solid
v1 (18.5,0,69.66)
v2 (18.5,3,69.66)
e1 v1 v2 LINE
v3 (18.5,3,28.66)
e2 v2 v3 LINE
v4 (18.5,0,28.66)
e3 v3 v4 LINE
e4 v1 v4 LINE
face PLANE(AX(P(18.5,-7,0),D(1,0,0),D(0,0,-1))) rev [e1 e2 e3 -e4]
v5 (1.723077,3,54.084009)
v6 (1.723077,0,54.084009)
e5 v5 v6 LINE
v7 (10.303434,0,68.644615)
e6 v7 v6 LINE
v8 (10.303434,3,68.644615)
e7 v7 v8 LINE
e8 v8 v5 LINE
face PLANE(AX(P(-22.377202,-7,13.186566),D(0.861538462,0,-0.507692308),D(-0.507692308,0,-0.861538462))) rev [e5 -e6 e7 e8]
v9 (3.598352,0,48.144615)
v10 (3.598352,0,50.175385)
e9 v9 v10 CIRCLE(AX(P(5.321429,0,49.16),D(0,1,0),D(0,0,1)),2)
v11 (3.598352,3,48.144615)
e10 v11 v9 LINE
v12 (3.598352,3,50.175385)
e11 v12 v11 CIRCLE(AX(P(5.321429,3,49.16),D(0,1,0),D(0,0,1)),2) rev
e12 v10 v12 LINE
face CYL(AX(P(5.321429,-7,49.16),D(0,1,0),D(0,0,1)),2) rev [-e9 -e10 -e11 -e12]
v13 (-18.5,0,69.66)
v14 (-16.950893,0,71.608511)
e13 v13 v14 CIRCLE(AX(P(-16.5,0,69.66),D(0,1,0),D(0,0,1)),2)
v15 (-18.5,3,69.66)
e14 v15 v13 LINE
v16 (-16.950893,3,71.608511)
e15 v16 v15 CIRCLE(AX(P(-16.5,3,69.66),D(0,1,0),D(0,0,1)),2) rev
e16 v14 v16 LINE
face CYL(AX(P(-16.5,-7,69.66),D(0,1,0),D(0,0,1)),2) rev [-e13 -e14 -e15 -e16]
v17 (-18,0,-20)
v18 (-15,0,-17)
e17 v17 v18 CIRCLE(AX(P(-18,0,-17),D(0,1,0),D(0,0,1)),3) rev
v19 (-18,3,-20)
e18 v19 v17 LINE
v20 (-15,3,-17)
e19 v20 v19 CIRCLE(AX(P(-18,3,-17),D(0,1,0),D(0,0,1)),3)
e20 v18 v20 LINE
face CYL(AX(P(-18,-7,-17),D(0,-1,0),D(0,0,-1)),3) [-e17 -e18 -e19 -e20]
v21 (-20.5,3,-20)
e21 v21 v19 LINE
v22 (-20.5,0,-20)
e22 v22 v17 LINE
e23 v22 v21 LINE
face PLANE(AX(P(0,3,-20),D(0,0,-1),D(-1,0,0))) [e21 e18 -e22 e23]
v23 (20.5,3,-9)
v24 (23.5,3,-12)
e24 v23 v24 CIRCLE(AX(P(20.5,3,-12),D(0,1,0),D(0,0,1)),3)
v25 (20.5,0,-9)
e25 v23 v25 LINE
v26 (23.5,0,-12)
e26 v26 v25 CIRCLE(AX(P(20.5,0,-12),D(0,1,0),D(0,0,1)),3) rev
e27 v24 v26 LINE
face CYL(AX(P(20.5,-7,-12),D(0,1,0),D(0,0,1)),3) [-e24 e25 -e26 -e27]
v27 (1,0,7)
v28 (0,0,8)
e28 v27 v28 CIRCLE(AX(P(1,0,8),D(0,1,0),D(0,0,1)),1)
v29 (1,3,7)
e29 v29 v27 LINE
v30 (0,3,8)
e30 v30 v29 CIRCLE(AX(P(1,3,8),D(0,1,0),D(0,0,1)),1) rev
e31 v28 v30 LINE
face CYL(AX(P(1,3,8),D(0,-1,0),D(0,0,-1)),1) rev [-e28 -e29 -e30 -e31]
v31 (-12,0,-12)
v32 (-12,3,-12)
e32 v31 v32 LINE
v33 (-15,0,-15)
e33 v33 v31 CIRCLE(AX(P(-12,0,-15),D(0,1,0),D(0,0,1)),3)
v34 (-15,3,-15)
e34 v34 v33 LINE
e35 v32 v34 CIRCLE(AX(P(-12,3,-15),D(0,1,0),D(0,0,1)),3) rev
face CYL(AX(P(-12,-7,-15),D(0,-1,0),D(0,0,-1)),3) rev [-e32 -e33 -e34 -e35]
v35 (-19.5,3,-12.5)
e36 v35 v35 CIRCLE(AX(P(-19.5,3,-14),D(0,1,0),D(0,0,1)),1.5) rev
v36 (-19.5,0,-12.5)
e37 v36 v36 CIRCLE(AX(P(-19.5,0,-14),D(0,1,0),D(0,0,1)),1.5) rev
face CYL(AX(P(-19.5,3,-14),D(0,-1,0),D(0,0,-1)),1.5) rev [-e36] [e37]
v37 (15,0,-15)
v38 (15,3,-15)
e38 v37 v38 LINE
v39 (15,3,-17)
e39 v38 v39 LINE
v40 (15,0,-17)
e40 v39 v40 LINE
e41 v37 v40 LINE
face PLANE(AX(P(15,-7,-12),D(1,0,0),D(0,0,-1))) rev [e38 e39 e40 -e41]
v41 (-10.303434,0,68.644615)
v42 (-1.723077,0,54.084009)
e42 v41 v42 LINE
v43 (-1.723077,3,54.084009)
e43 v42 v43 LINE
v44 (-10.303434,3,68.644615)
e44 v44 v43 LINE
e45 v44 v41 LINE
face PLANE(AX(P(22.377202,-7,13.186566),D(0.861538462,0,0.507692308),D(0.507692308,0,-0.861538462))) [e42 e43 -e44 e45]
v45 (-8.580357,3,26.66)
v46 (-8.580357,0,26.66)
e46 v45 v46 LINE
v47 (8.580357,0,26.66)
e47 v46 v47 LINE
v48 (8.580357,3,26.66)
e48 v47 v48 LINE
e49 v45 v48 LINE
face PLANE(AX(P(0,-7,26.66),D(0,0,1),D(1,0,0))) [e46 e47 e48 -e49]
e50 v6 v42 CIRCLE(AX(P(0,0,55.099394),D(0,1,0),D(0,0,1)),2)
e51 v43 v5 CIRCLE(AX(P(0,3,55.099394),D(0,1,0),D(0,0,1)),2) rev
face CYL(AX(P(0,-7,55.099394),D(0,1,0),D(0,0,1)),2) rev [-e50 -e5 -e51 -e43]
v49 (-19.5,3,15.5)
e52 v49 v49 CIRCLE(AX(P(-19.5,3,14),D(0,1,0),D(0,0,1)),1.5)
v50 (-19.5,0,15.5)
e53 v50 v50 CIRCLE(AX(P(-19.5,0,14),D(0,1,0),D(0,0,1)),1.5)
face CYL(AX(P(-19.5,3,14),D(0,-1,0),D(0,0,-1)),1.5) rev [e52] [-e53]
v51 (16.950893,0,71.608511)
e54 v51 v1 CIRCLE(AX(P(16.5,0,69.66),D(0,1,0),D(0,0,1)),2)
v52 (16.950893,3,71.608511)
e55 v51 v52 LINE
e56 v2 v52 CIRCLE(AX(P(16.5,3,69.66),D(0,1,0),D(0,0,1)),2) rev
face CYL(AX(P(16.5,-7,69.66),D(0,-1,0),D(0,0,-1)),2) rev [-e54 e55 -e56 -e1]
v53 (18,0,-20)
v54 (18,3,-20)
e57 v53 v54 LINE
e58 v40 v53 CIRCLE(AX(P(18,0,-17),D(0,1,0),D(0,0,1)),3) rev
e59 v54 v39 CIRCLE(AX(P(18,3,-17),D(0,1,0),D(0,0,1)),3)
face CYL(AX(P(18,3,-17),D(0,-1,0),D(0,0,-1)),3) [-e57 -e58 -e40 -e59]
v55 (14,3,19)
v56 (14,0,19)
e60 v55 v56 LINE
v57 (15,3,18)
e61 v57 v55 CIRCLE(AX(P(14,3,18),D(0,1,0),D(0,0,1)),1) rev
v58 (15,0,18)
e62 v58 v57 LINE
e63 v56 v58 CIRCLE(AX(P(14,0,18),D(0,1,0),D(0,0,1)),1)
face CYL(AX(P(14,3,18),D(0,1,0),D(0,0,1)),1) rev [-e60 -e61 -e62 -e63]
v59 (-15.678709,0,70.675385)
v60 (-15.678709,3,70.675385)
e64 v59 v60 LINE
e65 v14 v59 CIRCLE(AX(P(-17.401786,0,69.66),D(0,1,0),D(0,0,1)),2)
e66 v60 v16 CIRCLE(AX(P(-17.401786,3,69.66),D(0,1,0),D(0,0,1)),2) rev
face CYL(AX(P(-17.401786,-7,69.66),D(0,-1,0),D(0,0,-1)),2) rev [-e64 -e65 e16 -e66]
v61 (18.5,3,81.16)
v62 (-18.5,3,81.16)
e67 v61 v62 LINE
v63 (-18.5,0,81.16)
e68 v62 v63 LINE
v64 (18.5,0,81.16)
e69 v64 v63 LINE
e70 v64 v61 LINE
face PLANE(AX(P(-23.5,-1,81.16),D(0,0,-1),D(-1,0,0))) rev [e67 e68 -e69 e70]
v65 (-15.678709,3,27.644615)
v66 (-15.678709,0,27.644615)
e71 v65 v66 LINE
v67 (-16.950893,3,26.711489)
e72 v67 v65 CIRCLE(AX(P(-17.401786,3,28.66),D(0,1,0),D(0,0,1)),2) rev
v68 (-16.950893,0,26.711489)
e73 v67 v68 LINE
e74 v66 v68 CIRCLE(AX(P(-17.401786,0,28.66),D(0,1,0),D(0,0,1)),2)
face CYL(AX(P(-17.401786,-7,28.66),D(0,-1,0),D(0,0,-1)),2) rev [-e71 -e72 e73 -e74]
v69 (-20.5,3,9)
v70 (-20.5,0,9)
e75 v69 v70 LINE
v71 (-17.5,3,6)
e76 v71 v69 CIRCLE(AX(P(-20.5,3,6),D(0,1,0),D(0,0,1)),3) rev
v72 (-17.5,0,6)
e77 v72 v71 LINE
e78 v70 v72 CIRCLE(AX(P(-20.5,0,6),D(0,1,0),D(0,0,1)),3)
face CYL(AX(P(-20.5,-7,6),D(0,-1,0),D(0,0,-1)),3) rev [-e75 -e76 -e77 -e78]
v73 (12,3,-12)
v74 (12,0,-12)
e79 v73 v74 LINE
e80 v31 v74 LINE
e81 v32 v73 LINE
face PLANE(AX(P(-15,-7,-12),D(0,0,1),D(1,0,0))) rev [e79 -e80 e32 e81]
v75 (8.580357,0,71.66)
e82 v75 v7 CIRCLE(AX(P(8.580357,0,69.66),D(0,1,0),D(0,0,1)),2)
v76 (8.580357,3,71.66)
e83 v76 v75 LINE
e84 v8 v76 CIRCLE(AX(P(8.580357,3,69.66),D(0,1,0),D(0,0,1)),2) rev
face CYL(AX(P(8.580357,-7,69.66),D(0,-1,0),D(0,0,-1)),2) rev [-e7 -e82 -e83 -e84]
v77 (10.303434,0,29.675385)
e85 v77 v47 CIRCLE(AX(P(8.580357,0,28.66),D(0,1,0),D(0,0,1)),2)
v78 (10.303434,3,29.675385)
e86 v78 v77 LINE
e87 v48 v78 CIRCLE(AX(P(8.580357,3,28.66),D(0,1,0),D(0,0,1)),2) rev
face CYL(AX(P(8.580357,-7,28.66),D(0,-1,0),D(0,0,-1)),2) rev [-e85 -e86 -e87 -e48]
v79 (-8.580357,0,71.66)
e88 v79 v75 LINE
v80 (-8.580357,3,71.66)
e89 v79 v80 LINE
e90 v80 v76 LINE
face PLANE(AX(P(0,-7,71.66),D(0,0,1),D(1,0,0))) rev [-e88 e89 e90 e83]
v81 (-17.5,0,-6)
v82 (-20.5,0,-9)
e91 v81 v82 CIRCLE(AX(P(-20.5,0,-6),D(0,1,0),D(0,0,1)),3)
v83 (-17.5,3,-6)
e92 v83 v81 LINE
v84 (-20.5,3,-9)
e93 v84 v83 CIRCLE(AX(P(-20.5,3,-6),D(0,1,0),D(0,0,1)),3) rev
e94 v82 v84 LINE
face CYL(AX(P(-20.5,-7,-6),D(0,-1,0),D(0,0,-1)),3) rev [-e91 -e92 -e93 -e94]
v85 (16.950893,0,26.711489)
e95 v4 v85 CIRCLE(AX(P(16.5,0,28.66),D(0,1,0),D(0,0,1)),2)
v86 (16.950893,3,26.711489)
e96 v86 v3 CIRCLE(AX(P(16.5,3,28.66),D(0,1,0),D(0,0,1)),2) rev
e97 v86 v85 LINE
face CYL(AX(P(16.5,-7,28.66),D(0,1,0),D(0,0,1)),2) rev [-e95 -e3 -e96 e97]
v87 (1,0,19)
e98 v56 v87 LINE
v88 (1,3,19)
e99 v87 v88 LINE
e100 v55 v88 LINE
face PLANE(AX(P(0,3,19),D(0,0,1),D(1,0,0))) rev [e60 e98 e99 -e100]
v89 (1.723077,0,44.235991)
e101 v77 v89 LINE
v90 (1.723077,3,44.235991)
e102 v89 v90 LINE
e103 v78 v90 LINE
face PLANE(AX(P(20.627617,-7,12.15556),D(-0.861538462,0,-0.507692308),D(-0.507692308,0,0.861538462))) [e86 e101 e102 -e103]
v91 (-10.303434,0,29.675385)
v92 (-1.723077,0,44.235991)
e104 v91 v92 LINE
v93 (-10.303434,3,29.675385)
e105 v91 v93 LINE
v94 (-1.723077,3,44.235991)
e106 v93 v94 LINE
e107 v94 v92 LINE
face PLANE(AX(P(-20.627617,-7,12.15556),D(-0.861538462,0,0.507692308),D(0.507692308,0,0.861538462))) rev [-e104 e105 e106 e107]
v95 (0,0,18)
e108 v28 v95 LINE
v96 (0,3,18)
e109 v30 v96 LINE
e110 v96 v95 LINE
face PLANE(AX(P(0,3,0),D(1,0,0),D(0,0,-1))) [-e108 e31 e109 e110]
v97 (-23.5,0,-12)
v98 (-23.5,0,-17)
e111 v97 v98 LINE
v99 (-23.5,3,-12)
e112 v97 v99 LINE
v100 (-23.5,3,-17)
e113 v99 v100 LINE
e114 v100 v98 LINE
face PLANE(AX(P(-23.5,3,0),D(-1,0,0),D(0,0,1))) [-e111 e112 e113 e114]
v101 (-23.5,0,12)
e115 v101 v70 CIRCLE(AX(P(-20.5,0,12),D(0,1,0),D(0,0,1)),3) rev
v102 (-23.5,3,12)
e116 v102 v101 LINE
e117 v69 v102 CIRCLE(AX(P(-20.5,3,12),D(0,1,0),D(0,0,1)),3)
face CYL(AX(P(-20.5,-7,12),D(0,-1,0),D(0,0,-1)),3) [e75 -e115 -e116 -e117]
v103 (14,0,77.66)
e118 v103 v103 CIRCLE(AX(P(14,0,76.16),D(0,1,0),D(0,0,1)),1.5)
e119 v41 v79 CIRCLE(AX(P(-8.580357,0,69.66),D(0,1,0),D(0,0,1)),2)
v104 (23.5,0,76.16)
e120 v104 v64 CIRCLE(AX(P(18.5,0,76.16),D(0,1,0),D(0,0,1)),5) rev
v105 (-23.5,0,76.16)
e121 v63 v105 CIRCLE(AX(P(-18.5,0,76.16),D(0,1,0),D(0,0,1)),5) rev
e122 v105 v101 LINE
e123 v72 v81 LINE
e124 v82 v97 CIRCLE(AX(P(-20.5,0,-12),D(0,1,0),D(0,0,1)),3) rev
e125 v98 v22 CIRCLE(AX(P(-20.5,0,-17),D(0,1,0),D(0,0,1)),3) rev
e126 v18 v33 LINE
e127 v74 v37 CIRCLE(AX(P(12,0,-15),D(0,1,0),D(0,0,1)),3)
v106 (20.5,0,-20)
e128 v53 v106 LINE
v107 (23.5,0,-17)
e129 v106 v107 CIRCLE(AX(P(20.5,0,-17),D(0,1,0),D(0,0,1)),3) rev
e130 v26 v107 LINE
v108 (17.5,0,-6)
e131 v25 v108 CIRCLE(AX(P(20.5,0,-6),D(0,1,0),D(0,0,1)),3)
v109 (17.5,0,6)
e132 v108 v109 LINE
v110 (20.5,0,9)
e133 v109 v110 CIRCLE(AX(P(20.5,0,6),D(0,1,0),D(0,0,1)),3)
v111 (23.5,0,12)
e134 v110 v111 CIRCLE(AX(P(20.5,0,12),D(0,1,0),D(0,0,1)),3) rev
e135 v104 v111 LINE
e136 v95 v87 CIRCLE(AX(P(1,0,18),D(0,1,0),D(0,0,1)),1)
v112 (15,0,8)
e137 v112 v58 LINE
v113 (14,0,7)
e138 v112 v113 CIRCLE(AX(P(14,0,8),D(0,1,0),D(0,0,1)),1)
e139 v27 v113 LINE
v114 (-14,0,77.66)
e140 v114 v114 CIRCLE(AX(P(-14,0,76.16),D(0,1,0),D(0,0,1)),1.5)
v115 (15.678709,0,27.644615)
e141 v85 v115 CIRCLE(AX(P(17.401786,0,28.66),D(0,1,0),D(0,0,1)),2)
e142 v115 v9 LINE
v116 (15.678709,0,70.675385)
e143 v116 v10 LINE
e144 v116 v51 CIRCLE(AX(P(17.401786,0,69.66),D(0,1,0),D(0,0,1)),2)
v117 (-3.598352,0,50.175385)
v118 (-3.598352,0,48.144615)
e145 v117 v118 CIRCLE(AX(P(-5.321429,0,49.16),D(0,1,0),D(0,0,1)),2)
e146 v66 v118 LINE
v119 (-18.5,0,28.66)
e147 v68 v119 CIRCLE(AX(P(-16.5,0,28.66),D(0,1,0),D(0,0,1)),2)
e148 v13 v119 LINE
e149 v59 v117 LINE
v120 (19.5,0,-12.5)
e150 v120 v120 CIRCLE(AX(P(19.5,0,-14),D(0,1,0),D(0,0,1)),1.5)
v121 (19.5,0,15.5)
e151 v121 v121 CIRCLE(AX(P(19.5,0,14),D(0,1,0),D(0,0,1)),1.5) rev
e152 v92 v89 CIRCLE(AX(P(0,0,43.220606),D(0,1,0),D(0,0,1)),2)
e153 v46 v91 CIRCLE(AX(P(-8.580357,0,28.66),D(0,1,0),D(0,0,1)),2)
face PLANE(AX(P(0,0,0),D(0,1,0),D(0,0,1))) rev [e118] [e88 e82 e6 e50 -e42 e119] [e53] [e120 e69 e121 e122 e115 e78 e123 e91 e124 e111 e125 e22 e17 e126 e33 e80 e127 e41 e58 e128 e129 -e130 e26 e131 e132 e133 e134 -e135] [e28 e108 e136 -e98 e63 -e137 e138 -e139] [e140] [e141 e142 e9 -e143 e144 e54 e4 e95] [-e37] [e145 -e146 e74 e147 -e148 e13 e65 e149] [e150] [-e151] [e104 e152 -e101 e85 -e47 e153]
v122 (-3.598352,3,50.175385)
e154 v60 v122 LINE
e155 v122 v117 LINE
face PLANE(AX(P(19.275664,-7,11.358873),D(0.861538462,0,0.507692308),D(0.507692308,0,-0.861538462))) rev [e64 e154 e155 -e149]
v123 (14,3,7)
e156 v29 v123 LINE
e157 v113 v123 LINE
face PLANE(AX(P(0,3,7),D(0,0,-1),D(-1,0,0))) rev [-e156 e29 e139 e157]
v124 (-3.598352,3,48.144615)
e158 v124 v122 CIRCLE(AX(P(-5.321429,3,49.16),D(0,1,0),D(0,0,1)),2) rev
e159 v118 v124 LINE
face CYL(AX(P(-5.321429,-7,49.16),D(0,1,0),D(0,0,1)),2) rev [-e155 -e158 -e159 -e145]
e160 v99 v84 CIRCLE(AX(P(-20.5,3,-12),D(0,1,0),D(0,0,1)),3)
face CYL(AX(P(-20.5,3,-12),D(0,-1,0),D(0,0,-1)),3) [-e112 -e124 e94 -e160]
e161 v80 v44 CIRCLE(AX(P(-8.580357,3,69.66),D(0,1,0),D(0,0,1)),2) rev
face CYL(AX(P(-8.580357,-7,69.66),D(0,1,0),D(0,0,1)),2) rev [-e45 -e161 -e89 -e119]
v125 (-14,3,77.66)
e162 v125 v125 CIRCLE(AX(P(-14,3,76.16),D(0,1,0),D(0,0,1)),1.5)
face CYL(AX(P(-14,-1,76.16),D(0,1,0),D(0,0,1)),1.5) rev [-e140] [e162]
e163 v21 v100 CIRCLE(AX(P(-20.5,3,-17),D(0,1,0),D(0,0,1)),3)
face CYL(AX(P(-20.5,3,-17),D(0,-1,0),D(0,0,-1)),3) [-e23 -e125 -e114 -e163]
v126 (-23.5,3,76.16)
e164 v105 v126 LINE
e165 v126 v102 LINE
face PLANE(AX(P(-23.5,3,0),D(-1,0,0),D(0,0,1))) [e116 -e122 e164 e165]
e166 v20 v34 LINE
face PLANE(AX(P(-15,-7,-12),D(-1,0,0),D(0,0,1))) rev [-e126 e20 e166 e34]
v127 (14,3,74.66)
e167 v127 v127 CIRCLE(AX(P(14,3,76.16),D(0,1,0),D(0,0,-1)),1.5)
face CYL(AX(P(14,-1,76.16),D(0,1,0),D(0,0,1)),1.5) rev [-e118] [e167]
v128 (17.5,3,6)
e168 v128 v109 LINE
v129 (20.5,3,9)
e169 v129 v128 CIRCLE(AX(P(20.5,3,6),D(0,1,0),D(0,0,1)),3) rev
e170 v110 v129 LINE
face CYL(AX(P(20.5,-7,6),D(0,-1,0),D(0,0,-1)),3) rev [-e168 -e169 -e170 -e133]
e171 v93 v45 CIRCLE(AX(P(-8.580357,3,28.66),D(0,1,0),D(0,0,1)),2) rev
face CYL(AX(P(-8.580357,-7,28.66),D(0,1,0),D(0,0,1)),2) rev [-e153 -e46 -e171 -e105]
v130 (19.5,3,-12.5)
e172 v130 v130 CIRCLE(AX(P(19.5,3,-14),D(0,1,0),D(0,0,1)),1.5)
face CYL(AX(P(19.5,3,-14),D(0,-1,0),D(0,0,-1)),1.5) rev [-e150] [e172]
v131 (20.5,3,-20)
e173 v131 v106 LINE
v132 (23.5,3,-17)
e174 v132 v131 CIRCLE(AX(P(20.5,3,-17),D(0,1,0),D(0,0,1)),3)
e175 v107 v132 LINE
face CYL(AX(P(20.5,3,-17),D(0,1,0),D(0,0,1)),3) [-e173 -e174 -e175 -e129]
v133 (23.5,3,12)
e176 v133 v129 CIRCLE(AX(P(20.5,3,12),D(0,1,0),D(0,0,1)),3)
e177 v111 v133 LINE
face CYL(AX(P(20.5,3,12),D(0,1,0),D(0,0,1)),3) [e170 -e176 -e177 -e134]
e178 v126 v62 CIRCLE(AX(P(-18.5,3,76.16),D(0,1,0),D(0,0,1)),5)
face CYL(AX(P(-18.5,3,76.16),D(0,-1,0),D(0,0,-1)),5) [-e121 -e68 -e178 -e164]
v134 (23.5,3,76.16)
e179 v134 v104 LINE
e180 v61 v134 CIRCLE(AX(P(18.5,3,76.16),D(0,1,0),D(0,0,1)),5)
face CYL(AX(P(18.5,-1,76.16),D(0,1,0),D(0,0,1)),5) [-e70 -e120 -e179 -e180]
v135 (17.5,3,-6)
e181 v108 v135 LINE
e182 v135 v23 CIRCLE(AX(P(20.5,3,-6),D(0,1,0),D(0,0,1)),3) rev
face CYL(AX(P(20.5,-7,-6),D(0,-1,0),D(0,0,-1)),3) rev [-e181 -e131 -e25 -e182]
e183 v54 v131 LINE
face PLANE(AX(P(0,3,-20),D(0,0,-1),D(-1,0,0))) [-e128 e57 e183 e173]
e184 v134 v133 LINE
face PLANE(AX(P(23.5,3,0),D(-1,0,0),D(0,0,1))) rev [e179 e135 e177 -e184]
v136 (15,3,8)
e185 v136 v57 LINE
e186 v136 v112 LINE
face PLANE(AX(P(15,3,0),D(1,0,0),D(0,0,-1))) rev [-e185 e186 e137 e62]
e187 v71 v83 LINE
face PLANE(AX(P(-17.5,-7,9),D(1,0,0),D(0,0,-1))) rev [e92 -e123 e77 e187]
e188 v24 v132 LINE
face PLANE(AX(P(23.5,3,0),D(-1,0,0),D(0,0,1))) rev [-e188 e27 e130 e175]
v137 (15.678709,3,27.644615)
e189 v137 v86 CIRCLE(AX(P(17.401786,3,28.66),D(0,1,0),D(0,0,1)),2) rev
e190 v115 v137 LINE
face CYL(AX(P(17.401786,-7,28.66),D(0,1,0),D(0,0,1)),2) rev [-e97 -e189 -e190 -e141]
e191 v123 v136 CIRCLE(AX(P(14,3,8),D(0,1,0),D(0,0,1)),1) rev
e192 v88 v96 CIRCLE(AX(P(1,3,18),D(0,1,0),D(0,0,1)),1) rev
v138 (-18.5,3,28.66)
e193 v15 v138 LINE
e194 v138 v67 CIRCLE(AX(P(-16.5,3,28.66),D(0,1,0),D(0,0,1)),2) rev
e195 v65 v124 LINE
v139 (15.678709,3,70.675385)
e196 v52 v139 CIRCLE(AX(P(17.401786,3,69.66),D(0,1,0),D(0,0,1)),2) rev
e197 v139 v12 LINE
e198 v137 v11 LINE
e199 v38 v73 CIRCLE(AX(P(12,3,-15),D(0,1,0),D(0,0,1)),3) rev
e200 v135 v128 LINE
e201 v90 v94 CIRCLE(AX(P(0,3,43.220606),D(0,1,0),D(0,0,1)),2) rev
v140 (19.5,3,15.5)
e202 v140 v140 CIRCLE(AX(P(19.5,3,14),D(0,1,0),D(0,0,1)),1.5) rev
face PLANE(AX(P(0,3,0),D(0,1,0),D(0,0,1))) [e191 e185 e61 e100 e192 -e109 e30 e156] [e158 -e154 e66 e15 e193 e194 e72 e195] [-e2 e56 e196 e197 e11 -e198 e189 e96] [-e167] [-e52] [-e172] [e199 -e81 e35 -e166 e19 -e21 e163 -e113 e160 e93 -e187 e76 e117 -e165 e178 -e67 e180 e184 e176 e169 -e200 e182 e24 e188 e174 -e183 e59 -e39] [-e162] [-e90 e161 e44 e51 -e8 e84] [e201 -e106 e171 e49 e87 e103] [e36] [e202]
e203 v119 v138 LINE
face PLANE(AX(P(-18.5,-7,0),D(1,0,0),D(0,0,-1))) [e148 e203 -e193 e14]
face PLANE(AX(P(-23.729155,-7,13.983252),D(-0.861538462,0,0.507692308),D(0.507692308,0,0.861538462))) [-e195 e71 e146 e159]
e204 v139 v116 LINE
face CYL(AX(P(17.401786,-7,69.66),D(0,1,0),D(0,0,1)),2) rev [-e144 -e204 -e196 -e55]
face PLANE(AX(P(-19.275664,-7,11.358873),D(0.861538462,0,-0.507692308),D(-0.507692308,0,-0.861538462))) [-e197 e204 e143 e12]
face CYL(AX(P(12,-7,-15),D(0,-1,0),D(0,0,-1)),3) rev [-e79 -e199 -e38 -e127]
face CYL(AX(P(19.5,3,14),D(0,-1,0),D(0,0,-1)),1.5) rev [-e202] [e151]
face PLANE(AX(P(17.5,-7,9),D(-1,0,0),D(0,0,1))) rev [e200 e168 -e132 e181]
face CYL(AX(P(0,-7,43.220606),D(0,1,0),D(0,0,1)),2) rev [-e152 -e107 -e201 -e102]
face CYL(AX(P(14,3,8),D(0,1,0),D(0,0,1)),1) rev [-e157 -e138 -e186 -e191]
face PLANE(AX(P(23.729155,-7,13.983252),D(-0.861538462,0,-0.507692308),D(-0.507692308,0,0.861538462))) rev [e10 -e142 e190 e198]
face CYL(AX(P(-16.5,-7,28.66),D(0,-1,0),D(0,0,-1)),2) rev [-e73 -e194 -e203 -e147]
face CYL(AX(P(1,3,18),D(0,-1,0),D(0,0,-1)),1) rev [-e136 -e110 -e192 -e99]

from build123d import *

# Parameters (mm, degrees)
SKETCH_1_W          = 47
SKETCH_1_H          = 40
SKETCH_1_R          = 1.5
SKETCH_1_W_2        = 30
SKETCH_1_H_2        = 12
SKETCH_1_H_3        = 66.16
SKETCH_1_W_3        = 15
EXTRUDE_1_DEPTH     = 3
SKETCH_4_R          = 1.5
SKETCH_4_W          = 47
SKETCH_4_H          = 5
CUT_EXTRUDE_2_DEPTH = 4
SKETCH_7_W          = 30
SKETCH_7_H          = 8
SKETCH_7_W_2        = 6
SKETCH_7_H_2        = 18
CUT_EXTRUDE_3_DEPTH = 10
FILLET_2_R          = 3
FILLET_3_R          = 1
CUT_EXTRUDE_4_DEPTH = 10
FILLET_4_R          = 2
FILLET_5_R          = 5
FILLET_6_R          = 3
FILLET_7_R          = 3


# Some blends are built 0.0001 mm under size
with BuildPart() as part:
    # 草图1 → 凸台-拉伸1 (new body)
    # profile 1 of 3: a face of its own
    with BuildSketch(Plane(origin=(0, 0, 0), x_dir=(1, 0, 0), z_dir=(0, 1, 0))):
        Rectangle(SKETCH_1_W, SKETCH_1_H)
        with Locations(Location((19.5, -14, 0), (0, 0, 270))):
            Circle(SKETCH_1_R, mode=Mode.SUBTRACT)
        with Locations(Location((19.5, 14, 0), (0, 0, 270))):
            Circle(SKETCH_1_R, mode=Mode.SUBTRACT)
        with Locations(Location((-19.5, -14, 0), (0, 0, 270))):
            Circle(SKETCH_1_R, mode=Mode.SUBTRACT)
        with Locations(Location((-19.5, 14, 0), (0, 0, 270))):
            Circle(SKETCH_1_R, mode=Mode.SUBTRACT)
        with Locations((0, -13)):
            Rectangle(SKETCH_1_W_2, SKETCH_1_H_2, mode=Mode.SUBTRACT)
    # profile 2 of 3: a face of its own
    with BuildSketch(Plane(origin=(0, 0, 0), x_dir=(1, 0, 0), z_dir=(0, 1, 0))):
        with Locations((0, -53.08)):
            Rectangle(SKETCH_1_W, SKETCH_1_H_3)
    # profile 3 of 3: a face of its own
    with BuildSketch(Plane(origin=(0, 0, 0), x_dir=(1, 0, 0), z_dir=(0, 1, 0))):
        with Locations((-7.5, -13)):
            Rectangle(SKETCH_1_W_3, SKETCH_1_H_2)
    extrude(amount=EXTRUDE_1_DEPTH)

    # 草图4 → 切除-拉伸2 (cut)
    with BuildSketch(Plane(origin=(0, 3, 0), x_dir=(1, 0, 0), z_dir=(0, 1, 0))):
        with Locations(Location((-14, -76.16, 0), (0, 0, 270))):
            Circle(SKETCH_4_R)
        with Locations(Location((14, -76.16, 0), (0, 0, 270))):
            Circle(SKETCH_4_R)
        with Locations((0, -83.66)):
            Rectangle(SKETCH_4_W, SKETCH_4_H)
    extrude(amount=-CUT_EXTRUDE_2_DEPTH, mode=Mode.SUBTRACT)

    # 草图7 → 切除-拉伸3 (cut)
    with BuildSketch(Plane(origin=(0, 3, 0), x_dir=(1, 0, 0), z_dir=(0, 1, 0))):
        with Locations((0, 16)):
            Rectangle(SKETCH_7_W, SKETCH_7_H)
        with Locations((20.5, 0)):
            Rectangle(SKETCH_7_W_2, SKETCH_7_H_2)
        with Locations((-20.5, 0)):
            Rectangle(SKETCH_7_W_2, SKETCH_7_H_2)
    extrude(amount=-CUT_EXTRUDE_3_DEPTH, mode=Mode.SUBTRACT)

    # 圆角2
    fillet_2_edges = [part.edges().sort_by_distance(p)[0] for p in [
        (-23.5, 1.5, -20),
        (23.5, 1.5, -20),
    ]]
    fillet(fillet_2_edges, radius=FILLET_2_R)

    # 圆角3
    fillet_3_edges = [part.edges().sort_by_distance(p)[0] for p in [
        (0, 1.5, 19),
        (15, 1.5, 19),
        (15, 1.5, 7),
        (0, 1.5, 7),
    ]]
    fillet(fillet_3_edges, radius=FILLET_3_R)

    # 草图9 → 切除-拉伸4 (cut)
    with BuildSketch(Plane(origin=(0, 3, 0), x_dir=(1, 0, 0), z_dir=(0, 1, 0))):
        Polygon((-3, -49.16), (-16.258928571, -26.66), (-18.5, -26.66), (-18.5, -71.66), (-16.258928571, -71.66), align=None)
        Polygon((0, -47.16), (12.080357143, -26.66), (-12.080357143, -26.66), align=None)
        Polygon((18.5, -26.66), (16.258928571, -26.66), (3, -49.16), (16.258928571, -71.66), (18.5, -71.66), align=None)
        Polygon((-12.080357143, -71.66), (12.080357143, -71.66), (0, -51.16), align=None)
    extrude(amount=-CUT_EXTRUDE_4_DEPTH, mode=Mode.SUBTRACT)

    # 圆角4
    # the kernel refuses this fillet: 2 mm, written as the material it adds along each edge
    with BuildSketch(Plane(origin=(16.258928571, 3, 71.66), x_dir=(-0.5076923076923154, 0, -0.8615384615384569), z_dir=(0, -1, 0)), Plane(origin=(16.258928571, 3, 26.66), x_dir=(1, 0, 0), z_dir=(0, -1, 0)), Plane(origin=(-16.258928571, 3, 71.66), x_dir=(-1, 0, 0), z_dir=(0, -1, 0)), Plane(origin=(-16.258928571, 3, 26.66), x_dir=(0.5076923076923154, 0, 0.8615384615384569), z_dir=(0, -1, 0))) as fillet_4_piece_1:
        with BuildLine():
            CenterArc((FILLET_4_R * 0.571428571429, FILLET_4_R), FILLET_4_R, 210.510237406, 59.489762594)
            Line((-FILLET_4_R * 0.29010989011, FILLET_4_R * 0.492307692308), (0, 0))
            Line((0, 0), (FILLET_4_R * 0.571428571429, 0))
        make_face()
    extrude(amount=3)
    with BuildSketch(Plane(origin=(3, 3, 49.16), x_dir=(0.5076923076923108, 0, -0.8615384615384596), z_dir=(0, -1, 0))) as fillet_4_piece_2:
        with BuildLine():
            CenterArc((FILLET_4_R * 0.589285714286, FILLET_4_R), FILLET_4_R, 208.979525188, 61.020474812)
            Line((-FILLET_4_R * 0.285507185123, FILLET_4_R * 0.51550295858), (0, 0))
            Line((0, 0), (FILLET_4_R * 0.589285714286, 0))
        make_face()
    extrude(amount=3)
    with BuildSketch(Plane(origin=(18.5, 3, 26.66), x_dir=(-1, 0, 0), z_dir=(0, -1, 0))) as fillet_4_piece_3:
        with BuildLine():
            CenterArc((FILLET_4_R, -FILLET_4_R), FILLET_4_R, 90, 90)
            Line((0, -FILLET_4_R), (0, 0))
            Line((0, 0), (FILLET_4_R, 0))
        make_face()
    extrude(amount=3)
    with BuildSketch(Plane(origin=(18.5, 3, 71.66), x_dir=(-1, 0, 0), z_dir=(0, -1, 0)), Plane(origin=(-18.5, 3, 71.66), x_dir=(0, 0, -1), z_dir=(0, -1, 0)), Plane(origin=(-18.5, 3, 26.66), x_dir=(1, 0, 0), z_dir=(0, -1, 0))) as fillet_4_piece_4:
        with BuildLine():
            CenterArc((FILLET_4_R, FILLET_4_R), FILLET_4_R, 180, 90)
            Line((0, FILLET_4_R), (0, 0))
            Line((0, 0), (FILLET_4_R, 0))
        make_face()
    extrude(amount=3)
    with BuildSketch(Plane(origin=(-12.080357143, 3, 26.66), x_dir=(0.5076923076923134, 0, 0.8615384615384581), z_dir=(0, -1, 0)), Plane(origin=(-12.080357143, 3, 71.66), x_dir=(1, 0, 0), z_dir=(0, -1, 0))) as fillet_4_piece_5:
        with BuildLine():
            CenterArc((FILLET_4_R * 1.75, -FILLET_4_R), FILLET_4_R, 90, 120.510237406)
            Line((FILLET_4_R * 0.888461538462, -FILLET_4_R * 1.50769230769), (0, 0))
            Line((0, 0), (FILLET_4_R * 1.75, 0))
        make_face()
    extrude(amount=3)
    with BuildSketch(Plane(origin=(12.080357143, 3, 26.66), x_dir=(-0.5076923076923134, 0, 0.8615384615384581), z_dir=(0, -1, 0)), Plane(origin=(12.080357143, 3, 71.66), x_dir=(-1, 0, 0), z_dir=(0, -1, 0))) as fillet_4_piece_6:
        with BuildLine():
            CenterArc((FILLET_4_R * 1.75, FILLET_4_R), FILLET_4_R, 149.489762594, 120.510237406)
            Line((FILLET_4_R * 0.888461538462, FILLET_4_R * 1.50769230769), (0, 0))
            Line((0, 0), (FILLET_4_R * 1.75, 0))
        make_face()
    extrude(amount=3)
    with BuildSketch(Plane(origin=(0, 3, 47.16), x_dir=(-0.5076923076923119, 0, -0.8615384615384591), z_dir=(0, -1, 0)), Plane(origin=(0, 3, 51.16), x_dir=(0.5076923076923116, 0, 0.8615384615384594), z_dir=(0, -1, 0))) as fillet_4_piece_7:
        with BuildLine():
            CenterArc((FILLET_4_R * 1.69696969697, FILLET_4_R), FILLET_4_R, 151.020474812, 118.979525188)
            Line((FILLET_4_R * 0.822176797561, FILLET_4_R * 1.48449704142), (0, 0))
            Line((0, 0), (FILLET_4_R * 1.69696969697, 0))
        make_face()
    extrude(amount=3)
    with BuildSketch(Plane(origin=(-3, 3, 49.16), x_dir=(-0.507692307692313, 0, -0.8615384615384584), z_dir=(0, -1, 0))) as fillet_4_piece_8:
        with BuildLine():
            CenterArc((FILLET_4_R * 0.589285714286, -FILLET_4_R), FILLET_4_R, 90, 61.020474812)
            Line((-FILLET_4_R * 0.285507185123, -FILLET_4_R * 0.51550295858), (0, 0))
            Line((0, 0), (FILLET_4_R * 0.589285714286, 0))
        make_face()
    extrude(amount=3)

    # 圆角5
    fillet_5_edges = [part.edges().sort_by_distance(p)[0] for p in [
        (-23.5, 1.5, 81.16),
        (23.5, 1.5, 81.16),
    ]]
    fillet(fillet_5_edges, radius=FILLET_5_R)

    # 圆角6
    fillet_6_edges = [part.edges().sort_by_distance(p)[0] for p in [
        (15, 1.5, -20),
        (15, 1.5, -12),
        (-15, 1.5, -12),
        (-15, 1.5, -20),
        (17.5, 1.5, -9),
        (17.5, 1.5, 9),
        (-17.5, 1.5, 9),
        (-17.5, 1.5, -9),
    ]]
    fillet(fillet_6_edges, radius=FILLET_6_R)

    # 圆角7
    fillet_7_edges = [part.edges().sort_by_distance(p)[0] for p in [
        (23.5, 1.5, -9),
        (23.5, 1.5, 9),
        (-23.5, 1.5, 9),
        (-23.5, 1.5, -9),
    ]]
    fillet(fillet_7_edges, radius=FILLET_7_R - 0.0001)  # a hair under: the kernel refuses the full size


solid = part.part
